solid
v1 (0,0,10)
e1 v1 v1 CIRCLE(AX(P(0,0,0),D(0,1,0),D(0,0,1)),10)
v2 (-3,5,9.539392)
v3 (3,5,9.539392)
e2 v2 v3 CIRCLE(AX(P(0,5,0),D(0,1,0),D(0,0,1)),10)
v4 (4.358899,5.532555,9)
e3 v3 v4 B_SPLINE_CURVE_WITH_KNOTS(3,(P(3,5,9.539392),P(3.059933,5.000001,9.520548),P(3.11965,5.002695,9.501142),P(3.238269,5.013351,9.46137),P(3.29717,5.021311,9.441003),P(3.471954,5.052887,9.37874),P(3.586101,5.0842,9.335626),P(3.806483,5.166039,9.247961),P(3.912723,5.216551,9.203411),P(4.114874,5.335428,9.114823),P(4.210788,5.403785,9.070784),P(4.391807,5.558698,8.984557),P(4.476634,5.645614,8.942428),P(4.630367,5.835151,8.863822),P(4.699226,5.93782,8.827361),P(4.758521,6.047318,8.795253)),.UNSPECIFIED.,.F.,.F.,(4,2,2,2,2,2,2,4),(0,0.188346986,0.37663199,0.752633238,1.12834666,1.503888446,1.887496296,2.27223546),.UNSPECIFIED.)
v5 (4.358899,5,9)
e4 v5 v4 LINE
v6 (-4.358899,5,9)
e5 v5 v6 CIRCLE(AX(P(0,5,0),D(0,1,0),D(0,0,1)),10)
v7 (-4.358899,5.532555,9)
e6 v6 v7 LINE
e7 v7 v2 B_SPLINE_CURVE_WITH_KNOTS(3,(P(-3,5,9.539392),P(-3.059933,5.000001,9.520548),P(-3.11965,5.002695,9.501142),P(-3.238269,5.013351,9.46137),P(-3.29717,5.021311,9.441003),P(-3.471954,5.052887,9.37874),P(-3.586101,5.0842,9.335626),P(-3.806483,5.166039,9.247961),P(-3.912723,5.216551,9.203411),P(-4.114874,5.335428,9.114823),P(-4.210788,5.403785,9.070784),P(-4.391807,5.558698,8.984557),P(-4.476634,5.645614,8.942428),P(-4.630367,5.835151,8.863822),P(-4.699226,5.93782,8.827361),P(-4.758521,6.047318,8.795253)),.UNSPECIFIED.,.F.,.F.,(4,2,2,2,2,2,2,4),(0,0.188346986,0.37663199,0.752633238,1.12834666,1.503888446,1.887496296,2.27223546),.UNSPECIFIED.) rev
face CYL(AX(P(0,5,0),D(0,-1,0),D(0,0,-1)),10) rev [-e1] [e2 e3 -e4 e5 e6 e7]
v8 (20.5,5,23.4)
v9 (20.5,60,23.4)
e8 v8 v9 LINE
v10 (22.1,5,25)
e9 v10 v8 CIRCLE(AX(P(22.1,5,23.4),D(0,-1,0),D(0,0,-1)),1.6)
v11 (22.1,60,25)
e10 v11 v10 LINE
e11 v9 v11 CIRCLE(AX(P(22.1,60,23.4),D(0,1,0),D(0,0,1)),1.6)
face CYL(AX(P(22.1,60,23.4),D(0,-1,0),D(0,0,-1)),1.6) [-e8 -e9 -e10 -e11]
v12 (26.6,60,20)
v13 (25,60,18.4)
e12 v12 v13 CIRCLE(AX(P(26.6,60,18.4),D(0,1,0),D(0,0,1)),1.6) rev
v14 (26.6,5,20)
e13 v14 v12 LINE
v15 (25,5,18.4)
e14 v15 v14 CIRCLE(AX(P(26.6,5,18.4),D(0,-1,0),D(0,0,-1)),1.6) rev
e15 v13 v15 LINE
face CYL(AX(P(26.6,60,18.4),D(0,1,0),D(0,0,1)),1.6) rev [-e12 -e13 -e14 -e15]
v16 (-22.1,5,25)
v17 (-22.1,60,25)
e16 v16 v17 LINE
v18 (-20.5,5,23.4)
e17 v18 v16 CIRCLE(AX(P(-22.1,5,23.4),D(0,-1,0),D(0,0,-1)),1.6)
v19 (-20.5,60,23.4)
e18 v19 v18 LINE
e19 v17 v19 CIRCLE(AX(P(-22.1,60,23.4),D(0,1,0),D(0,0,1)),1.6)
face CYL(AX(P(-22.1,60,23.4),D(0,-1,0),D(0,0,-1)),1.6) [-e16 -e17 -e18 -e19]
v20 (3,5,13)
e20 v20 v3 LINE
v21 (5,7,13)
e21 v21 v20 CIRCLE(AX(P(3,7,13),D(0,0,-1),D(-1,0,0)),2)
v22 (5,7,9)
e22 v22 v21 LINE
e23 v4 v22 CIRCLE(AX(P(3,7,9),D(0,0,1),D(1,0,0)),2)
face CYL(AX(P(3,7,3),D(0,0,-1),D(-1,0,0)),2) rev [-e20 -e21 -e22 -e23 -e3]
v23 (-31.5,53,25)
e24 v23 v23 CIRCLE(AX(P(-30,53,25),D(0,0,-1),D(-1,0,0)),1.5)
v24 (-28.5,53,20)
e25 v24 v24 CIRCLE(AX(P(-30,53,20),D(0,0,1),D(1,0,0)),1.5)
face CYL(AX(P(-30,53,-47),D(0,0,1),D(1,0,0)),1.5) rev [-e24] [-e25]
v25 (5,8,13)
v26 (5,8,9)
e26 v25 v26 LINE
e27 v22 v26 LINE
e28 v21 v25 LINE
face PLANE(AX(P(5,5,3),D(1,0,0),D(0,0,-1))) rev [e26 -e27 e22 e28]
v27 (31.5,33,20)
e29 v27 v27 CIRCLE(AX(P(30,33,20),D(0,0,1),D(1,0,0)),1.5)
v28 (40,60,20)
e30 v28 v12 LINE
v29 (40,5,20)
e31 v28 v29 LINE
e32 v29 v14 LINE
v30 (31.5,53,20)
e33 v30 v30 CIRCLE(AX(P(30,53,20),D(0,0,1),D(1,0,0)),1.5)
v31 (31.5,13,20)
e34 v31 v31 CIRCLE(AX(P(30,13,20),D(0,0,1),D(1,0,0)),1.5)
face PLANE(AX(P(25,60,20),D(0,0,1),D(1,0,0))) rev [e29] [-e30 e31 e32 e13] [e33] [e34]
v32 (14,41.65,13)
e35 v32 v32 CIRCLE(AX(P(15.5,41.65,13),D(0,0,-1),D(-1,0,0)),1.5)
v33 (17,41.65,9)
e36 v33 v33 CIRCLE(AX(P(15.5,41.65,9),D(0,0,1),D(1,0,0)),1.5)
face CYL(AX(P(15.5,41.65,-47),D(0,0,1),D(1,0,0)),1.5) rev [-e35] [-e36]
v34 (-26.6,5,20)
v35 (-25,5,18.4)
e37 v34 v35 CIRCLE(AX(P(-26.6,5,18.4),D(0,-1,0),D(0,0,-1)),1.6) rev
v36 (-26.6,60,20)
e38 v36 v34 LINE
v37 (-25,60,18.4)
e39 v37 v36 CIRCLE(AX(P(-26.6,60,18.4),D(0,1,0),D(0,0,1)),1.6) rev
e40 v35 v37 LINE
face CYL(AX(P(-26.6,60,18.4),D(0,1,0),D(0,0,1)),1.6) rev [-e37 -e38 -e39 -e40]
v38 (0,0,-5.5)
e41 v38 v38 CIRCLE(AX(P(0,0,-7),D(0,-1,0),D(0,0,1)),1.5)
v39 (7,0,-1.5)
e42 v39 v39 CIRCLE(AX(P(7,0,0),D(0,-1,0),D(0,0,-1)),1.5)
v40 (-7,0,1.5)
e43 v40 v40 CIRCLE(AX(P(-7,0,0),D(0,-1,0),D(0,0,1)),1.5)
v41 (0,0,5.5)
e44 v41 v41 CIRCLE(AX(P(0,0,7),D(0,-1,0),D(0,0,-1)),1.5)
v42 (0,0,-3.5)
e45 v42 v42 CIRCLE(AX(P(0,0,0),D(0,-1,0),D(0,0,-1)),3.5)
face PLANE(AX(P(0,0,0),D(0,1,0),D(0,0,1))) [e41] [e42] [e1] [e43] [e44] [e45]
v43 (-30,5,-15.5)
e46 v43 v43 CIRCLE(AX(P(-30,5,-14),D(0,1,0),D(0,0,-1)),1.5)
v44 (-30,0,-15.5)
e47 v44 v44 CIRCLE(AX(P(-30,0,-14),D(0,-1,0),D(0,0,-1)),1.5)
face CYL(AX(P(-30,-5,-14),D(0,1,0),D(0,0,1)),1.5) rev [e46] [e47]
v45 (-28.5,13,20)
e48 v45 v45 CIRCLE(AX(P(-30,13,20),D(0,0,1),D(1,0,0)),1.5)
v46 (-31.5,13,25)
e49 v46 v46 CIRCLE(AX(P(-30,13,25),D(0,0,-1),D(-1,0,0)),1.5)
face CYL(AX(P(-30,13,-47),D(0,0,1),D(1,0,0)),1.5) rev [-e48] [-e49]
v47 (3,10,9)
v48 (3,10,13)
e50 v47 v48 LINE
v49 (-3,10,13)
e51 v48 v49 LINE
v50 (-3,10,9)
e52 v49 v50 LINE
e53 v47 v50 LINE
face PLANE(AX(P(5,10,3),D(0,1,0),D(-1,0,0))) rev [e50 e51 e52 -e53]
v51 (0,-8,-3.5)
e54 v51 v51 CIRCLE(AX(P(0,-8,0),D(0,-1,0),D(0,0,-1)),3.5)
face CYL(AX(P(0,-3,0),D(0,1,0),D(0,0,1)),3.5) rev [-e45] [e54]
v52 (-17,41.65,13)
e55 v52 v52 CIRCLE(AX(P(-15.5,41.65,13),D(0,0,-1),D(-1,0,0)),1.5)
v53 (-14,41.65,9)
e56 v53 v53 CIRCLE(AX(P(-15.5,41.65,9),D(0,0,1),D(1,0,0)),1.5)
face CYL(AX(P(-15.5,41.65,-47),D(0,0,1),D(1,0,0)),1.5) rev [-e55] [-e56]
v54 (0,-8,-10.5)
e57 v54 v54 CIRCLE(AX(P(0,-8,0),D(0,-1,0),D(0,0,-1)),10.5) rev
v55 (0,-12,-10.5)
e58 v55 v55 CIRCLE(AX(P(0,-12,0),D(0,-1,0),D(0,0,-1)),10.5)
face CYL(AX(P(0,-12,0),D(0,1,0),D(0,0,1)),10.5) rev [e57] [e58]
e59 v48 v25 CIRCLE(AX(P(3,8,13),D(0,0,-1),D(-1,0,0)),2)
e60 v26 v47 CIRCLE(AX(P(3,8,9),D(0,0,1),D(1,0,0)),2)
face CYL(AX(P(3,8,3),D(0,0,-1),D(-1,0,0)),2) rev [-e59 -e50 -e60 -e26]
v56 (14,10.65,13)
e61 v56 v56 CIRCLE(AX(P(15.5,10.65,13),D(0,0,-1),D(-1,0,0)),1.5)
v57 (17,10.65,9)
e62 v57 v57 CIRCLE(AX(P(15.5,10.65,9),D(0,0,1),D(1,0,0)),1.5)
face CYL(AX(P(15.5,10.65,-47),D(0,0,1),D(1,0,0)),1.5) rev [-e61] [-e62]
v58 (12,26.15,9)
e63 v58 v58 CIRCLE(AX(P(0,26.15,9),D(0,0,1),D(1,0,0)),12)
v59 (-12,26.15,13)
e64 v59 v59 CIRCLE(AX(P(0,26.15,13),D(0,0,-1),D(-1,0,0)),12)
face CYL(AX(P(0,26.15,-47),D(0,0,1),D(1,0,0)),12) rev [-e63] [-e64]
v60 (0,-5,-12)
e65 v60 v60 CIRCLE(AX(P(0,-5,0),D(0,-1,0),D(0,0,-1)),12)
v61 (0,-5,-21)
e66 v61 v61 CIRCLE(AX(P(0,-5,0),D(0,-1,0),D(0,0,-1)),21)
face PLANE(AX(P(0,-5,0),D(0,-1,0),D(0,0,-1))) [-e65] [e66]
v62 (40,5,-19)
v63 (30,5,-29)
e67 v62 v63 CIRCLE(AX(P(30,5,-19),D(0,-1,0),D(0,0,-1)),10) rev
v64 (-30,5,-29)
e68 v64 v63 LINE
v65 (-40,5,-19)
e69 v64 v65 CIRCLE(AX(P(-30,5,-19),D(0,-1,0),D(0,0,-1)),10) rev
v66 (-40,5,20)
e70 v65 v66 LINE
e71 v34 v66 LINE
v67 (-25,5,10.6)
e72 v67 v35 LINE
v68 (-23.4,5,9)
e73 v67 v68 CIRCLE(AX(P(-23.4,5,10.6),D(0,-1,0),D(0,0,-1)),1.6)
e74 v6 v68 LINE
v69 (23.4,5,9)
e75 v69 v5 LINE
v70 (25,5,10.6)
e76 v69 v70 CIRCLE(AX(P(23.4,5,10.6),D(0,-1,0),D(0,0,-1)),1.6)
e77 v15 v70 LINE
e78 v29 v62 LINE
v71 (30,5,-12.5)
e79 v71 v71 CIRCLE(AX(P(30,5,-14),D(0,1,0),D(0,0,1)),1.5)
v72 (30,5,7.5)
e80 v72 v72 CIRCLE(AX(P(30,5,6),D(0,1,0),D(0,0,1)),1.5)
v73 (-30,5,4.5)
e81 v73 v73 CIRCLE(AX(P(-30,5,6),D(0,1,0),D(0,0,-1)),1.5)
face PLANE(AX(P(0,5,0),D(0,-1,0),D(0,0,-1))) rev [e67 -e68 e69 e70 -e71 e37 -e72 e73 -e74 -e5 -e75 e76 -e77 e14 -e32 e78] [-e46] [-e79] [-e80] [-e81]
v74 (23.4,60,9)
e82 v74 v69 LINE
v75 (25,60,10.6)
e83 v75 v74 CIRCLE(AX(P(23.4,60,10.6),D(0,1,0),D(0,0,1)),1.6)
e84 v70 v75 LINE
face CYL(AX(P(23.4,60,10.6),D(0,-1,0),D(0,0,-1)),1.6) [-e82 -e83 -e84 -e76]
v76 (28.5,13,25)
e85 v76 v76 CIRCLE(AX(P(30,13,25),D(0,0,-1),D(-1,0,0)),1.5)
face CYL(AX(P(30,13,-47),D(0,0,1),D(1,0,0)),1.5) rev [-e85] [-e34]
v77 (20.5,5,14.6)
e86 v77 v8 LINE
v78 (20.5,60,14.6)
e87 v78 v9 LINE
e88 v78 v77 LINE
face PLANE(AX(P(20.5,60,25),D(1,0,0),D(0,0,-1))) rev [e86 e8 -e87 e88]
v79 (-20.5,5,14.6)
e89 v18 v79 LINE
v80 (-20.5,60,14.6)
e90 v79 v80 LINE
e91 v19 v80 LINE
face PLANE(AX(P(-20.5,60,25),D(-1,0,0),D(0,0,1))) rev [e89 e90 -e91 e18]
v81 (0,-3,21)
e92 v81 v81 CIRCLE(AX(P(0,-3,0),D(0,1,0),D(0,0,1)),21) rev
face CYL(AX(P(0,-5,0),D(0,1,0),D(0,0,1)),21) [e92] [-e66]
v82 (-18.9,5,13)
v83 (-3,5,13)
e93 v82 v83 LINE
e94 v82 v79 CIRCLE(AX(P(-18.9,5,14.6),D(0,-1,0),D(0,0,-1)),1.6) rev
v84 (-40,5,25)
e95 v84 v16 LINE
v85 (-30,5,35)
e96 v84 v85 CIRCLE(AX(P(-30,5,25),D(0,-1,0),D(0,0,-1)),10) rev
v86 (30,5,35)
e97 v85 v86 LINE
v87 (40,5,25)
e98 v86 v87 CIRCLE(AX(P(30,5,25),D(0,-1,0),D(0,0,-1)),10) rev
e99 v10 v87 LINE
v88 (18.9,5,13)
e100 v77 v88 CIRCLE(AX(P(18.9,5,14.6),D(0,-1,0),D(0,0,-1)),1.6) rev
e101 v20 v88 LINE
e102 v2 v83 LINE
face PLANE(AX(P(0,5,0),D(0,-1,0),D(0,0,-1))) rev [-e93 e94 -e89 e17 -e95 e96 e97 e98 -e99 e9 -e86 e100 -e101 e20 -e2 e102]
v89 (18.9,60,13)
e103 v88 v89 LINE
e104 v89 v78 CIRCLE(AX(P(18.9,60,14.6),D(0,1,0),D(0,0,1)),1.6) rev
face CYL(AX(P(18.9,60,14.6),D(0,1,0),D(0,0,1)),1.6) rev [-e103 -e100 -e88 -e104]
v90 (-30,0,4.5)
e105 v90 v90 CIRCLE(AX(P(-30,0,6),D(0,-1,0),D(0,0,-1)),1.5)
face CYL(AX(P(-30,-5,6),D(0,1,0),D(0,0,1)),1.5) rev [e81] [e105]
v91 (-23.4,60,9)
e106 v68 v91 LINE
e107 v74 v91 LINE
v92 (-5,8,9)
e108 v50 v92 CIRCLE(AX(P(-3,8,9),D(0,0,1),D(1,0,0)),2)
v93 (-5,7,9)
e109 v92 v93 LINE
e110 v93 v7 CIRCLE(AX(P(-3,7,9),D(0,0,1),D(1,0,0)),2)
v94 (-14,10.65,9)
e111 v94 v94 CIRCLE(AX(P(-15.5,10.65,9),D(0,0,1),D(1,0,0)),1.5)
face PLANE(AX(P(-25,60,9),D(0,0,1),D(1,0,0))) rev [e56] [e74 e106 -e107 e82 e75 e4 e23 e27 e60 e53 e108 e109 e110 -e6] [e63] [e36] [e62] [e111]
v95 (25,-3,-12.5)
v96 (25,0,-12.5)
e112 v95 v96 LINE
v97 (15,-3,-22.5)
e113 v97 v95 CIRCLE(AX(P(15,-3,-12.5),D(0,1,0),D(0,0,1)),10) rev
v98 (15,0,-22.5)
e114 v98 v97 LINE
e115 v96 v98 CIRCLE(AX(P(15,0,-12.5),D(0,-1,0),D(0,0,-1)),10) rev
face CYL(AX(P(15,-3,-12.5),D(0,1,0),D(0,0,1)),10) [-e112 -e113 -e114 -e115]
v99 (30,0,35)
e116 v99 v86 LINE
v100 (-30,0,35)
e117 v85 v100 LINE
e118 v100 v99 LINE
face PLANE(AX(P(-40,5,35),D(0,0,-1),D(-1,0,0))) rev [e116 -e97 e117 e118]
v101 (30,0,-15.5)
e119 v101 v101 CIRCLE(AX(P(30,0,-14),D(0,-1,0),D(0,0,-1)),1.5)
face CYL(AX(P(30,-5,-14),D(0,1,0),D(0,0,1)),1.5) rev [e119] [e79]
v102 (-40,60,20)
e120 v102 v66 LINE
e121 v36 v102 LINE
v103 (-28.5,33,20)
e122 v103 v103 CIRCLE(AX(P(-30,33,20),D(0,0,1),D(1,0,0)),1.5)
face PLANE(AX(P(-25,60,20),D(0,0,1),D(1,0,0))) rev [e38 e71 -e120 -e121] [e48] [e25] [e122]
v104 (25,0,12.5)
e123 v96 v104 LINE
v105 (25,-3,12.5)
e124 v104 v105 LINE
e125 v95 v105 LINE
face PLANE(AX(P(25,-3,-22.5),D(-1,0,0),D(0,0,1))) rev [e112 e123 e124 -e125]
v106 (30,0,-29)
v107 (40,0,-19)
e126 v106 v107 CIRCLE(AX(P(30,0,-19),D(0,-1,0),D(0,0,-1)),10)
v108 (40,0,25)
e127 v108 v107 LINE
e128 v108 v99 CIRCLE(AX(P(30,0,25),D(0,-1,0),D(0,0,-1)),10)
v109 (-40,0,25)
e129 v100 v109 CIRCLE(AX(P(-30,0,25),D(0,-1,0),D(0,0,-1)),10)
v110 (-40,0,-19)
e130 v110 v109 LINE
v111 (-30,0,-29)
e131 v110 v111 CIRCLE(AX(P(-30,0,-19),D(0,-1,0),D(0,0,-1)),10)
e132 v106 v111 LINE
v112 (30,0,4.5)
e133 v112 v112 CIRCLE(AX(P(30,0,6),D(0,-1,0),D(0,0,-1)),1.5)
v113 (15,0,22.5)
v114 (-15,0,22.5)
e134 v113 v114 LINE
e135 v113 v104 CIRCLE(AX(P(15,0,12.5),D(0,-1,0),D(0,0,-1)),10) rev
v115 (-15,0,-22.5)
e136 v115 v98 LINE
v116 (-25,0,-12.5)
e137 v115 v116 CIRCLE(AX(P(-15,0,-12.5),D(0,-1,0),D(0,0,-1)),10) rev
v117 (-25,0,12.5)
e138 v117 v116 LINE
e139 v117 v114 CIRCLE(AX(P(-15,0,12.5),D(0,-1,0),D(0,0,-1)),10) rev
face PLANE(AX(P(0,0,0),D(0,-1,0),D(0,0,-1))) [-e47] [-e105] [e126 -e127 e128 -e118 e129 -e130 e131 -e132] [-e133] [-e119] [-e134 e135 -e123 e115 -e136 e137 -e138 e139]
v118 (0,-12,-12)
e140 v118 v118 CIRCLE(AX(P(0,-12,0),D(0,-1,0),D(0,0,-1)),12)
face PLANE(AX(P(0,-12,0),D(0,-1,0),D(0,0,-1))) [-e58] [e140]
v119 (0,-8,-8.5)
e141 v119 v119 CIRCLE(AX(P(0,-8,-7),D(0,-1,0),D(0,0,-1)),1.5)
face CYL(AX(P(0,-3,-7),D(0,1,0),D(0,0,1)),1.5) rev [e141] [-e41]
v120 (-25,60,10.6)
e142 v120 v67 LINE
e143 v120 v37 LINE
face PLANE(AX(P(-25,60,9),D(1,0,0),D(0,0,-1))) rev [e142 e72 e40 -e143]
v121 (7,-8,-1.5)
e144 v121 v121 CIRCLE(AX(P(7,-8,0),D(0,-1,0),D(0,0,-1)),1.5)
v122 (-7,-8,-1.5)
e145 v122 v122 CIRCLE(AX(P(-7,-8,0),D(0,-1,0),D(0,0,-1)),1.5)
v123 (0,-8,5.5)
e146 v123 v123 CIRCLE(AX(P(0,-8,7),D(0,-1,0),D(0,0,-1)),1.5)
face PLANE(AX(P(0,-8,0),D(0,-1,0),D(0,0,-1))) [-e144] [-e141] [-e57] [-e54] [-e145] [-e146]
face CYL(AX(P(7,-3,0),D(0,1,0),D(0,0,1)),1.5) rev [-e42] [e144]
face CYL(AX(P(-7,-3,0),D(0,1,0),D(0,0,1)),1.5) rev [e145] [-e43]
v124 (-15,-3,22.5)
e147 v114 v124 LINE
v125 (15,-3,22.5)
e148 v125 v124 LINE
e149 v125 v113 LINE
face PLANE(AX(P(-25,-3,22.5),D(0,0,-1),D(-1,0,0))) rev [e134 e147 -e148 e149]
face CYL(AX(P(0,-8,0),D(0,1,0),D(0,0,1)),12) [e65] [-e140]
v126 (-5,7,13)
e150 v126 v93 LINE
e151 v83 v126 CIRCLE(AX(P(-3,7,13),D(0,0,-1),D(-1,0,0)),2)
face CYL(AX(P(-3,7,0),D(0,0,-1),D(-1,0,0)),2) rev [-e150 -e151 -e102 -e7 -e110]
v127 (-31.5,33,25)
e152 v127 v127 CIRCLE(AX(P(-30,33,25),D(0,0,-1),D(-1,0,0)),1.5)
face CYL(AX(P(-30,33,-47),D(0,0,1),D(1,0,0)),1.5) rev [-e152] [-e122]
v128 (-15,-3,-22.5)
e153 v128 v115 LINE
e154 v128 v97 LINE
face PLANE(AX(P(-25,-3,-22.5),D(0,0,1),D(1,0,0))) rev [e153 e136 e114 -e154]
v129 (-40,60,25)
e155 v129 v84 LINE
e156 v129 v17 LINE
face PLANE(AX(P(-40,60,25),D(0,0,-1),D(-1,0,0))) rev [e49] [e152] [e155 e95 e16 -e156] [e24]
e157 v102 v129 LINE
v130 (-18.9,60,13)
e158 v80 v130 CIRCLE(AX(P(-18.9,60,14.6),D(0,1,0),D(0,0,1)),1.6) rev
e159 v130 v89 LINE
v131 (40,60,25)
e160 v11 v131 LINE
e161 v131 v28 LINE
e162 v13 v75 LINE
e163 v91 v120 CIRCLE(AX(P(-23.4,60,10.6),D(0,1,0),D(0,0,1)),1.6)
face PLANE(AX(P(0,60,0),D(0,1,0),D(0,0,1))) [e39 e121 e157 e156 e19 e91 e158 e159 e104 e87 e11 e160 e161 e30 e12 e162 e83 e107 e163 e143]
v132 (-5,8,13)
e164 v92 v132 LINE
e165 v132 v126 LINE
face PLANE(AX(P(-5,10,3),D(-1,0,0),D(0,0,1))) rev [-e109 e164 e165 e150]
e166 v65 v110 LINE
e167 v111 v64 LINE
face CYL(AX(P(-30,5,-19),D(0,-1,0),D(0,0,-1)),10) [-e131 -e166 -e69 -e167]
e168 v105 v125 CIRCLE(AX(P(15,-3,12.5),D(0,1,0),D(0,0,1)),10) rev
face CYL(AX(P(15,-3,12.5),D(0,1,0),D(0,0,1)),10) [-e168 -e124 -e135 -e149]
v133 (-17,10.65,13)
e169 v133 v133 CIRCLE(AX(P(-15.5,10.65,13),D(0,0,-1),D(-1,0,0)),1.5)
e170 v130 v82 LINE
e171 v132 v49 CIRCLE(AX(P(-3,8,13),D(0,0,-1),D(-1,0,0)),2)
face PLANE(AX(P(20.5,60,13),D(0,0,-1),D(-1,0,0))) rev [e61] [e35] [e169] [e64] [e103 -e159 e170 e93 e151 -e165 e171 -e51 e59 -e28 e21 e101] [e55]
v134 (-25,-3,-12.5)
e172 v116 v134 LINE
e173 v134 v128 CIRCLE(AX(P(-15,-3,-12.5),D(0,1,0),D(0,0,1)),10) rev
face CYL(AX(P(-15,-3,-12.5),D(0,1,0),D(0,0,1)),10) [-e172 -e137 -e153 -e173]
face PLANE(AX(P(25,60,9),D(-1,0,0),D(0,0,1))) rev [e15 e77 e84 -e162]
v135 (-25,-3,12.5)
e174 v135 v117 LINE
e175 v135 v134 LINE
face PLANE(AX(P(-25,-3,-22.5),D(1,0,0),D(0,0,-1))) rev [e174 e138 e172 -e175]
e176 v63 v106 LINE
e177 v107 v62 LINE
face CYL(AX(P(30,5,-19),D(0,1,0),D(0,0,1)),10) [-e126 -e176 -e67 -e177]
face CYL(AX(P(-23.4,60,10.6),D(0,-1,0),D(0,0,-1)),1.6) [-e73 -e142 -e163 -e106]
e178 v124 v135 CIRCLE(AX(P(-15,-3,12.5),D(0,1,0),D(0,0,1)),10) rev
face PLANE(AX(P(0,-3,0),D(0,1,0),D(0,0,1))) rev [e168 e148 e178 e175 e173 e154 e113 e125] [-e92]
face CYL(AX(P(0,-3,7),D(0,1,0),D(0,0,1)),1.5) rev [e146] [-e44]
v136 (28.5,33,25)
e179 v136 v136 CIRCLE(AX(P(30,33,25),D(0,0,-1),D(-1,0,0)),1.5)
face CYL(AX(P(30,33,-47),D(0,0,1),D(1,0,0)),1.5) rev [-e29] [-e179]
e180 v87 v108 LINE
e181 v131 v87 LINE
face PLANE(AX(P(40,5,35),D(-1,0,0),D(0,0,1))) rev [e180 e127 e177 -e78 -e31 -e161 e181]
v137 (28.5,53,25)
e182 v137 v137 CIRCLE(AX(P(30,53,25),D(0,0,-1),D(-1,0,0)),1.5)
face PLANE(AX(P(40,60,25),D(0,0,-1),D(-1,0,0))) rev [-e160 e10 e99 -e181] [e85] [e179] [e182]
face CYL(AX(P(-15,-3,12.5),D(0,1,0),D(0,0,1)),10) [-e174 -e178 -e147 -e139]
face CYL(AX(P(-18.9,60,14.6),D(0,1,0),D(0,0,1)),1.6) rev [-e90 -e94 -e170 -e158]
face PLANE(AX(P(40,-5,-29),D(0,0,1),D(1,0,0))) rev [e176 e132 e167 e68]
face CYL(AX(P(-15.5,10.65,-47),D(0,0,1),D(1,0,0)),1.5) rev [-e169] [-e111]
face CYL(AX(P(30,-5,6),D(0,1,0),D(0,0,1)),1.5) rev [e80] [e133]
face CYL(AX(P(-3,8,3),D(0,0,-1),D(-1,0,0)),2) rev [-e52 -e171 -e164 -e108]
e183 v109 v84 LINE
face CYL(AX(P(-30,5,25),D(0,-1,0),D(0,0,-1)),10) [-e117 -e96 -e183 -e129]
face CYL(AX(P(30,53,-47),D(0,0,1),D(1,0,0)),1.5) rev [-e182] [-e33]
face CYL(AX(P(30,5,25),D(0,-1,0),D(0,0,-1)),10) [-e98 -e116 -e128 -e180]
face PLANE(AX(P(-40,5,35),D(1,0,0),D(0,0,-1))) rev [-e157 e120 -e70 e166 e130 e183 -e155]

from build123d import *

# Parameters (mm, degrees)
SKETCH_1_W               = 80
SKETCH_1_H               = 70
SKETCH_1_R               = 10
EXTRUDE_1_DEPTH          = 5
EXTRUDE_2_DEPTH          = 55
CUT_EXTRUDE_1_DEPTH      = 60
CUT_EXTRUDE_1_DEPTH_BACK = 60
SKETCH_3_R               = 12
SKETCH_3_R_2             = 1.5
FILLET_3_R               = 1.6
SKETCH_4_R               = 1.5
CUT_EXTRUDE_2_DEPTH      = 10
SKETCH_5_W               = 80
SKETCH_5_H               = 6
CUT_EXTRUDE_3_DEPTH      = 10
FILLET_4_R               = 10
CUT_EXTRUDE_4_DEPTH      = 10
FILLET_5_R               = 2
SKETCH_8_W               = 50
SKETCH_8_H               = 45
SKETCH_8_R               = 3.5
SKETCH_8_R_2             = 1.5
EXTRUDE_3_DEPTH          = 3
FILLET_6_R               = 10
SKETCH_10_R              = 12
SKETCH_10_R_2            = 1.5
SKETCH_10_R_3            = 3.5
EXTRUDE_4_DEPTH          = 5
SKETCH_12_R              = 12
SKETCH_12_R_2            = 10.5
EXTRUDE_5_DEPTH          = 4
SKETCH_13_R              = 21
SKETCH_13_R_2            = 12
EXTRUDE_6_DEPTH          = 2


with BuildPart() as part:
    # 草图1 → 凸台-拉伸1 (new body)
    with BuildSketch(Plane(origin=(0, 0, 0), x_dir=(1, 0, 0), z_dir=(0, 1, 0))):
        Rectangle(SKETCH_1_W, SKETCH_1_H)
        with Locations(Location((0, 0, 0), (0, 0, 270))):
            Circle(SKETCH_1_R, mode=Mode.SUBTRACT)
    extrude(amount=EXTRUDE_1_DEPTH)

    # 草图2 → 凸台-拉伸2 (add)
    with BuildSketch(Plane(origin=(0, 5, 0), x_dir=(1, 0, 0), z_dir=(0, 1, 0))):
        Polygon((-25, -9), (25, -9), (25, -20), (40, -20), (40, -25), (20.5, -25), (20.5, -13), (-20.5, -13), (-20.5, -25), (-40, -25), (-40, -20), (-25, -20), align=None)
    extrude(amount=EXTRUDE_2_DEPTH)

    # 草图3 → 切除-拉伸1 (cut, two sides: drawn at the far end of the back side and taken through both)
    with BuildSketch(Plane.XY.offset(13).offset(-CUT_EXTRUDE_1_DEPTH_BACK)):
        with Locations((0, 26.15)):
            Circle(SKETCH_3_R)
        with Locations((15.5, 41.65)):
            Circle(SKETCH_3_R_2)
        with Locations((15.5, 10.65)):
            Circle(SKETCH_3_R_2)
        with Locations((-15.5, 10.65)):
            Circle(SKETCH_3_R_2)
        with Locations((-15.5, 41.65)):
            Circle(SKETCH_3_R_2)
        with Locations((-30, 13)):
            Circle(SKETCH_3_R_2)
        with Locations((-30, 33)):
            Circle(SKETCH_3_R_2)
        with Locations((-30, 53)):
            Circle(SKETCH_3_R_2)
        with Locations((30, 53)):
            Circle(SKETCH_3_R_2)
        with Locations((30, 33)):
            Circle(SKETCH_3_R_2)
        with Locations((30, 13)):
            Circle(SKETCH_3_R_2)
    extrude(amount=CUT_EXTRUDE_1_DEPTH + CUT_EXTRUDE_1_DEPTH_BACK, mode=Mode.SUBTRACT)

    # 圆角3
    fillet_3_edges = [part.edges().sort_by_distance(p)[0] for p in [
        (25, 32.5, 20),
        (25, 32.5, 9),
        (-25, 32.5, 9),
        (-25, 32.5, 20),
        (-20.5, 32.5, 25),
        (-20.5, 32.5, 13),
        (20.5, 32.5, 13),
        (20.5, 32.5, 25),
    ]]
    fillet(fillet_3_edges, radius=FILLET_3_R)

    # 草图4 → 切除-拉伸2 (cut)
    with BuildSketch(Plane(origin=(0, 5, 0), x_dir=(1, 0, 0), z_dir=(0, 1, 0))):
        with Locations(Location((30, 14, 0), (0, 0, 270))):
            Circle(SKETCH_4_R)
        with Locations(Location((30, -6, 0), (0, 0, 270))):
            Circle(SKETCH_4_R)
        with Locations(Location((-30, -6, 0), (0, 0, 90))):
            Circle(SKETCH_4_R)
        with Locations(Location((-30, 14, 0), (0, 0, 90))):
            Circle(SKETCH_4_R)
    extrude(amount=-CUT_EXTRUDE_2_DEPTH, mode=Mode.SUBTRACT)

    # 草图5 → 切除-拉伸3 (cut)
    with BuildSketch(Plane(origin=(0, 5, 0), x_dir=(1, 0, 0), z_dir=(0, 1, 0))):
        with Locations((0, 32)):
            Rectangle(SKETCH_5_W, SKETCH_5_H)
    extrude(amount=-CUT_EXTRUDE_3_DEPTH, mode=Mode.SUBTRACT)

    # 圆角4
    fillet_4_edges = [part.edges().sort_by_distance(p)[0] for p in [
        (-40, 2.5, -29),
        (40, 2.5, -29),
        (40, 2.5, 35),
        (-40, 2.5, 35),
    ]]
    fillet(fillet_4_edges, radius=FILLET_4_R)

    # 草图6 → 切除-拉伸4 (cut)
    with BuildSketch(Plane.XY.offset(13)):
        Polygon((0, 5), (5, 5), (5, 10), (-5, 10), (-5, 5), align=None)
    extrude(amount=-CUT_EXTRUDE_4_DEPTH, mode=Mode.SUBTRACT)

    # 圆角5
    # the kernel refuses this fillet: 2 mm, written as the material it adds along each edge
    with BuildSketch(Plane(origin=(-5, 5, 13), x_dir=(1, 0, 0), z_dir=(0, 0, -1))) as fillet_5_piece_1_section:
        with BuildLine():
            CenterArc((FILLET_5_R, -FILLET_5_R), FILLET_5_R, 90, 90)
            Line((0, -FILLET_5_R), (0, 0))
            Line((0, 0), (FILLET_5_R, 0))
        make_face()
    fillet_5_piece_1 = extrude(amount=4, mode=Mode.PRIVATE)
    fillet_5_piece_1 = fillet_5_piece_1 - Plane(origin=(0, 5.457543307, 0), x_dir=(0, 0, 1), z_dir=(0, -1, 0)) * Cylinder(10, 17, mode=Mode.PRIVATE)
    add(fillet_5_piece_1)
    with BuildSketch(Plane(origin=(-5, 10, 13), x_dir=(0, -1, 0), z_dir=(0, 0, -1)), Plane(origin=(5, 10, 13), x_dir=(-1, 0, 0), z_dir=(0, 0, -1))) as fillet_5_piece_2:
        with BuildLine():
            CenterArc((FILLET_5_R, -FILLET_5_R), FILLET_5_R, 90, 90)
            Line((0, -FILLET_5_R), (0, 0))
            Line((0, 0), (FILLET_5_R, 0))
        make_face()
    extrude(amount=4)
    with BuildSketch(Plane(origin=(5, 5, 13), x_dir=(-1, 0, 0), z_dir=(0, 0, -1))) as fillet_5_piece_3_section:
        with BuildLine():
            CenterArc((FILLET_5_R, FILLET_5_R), FILLET_5_R, 180, 90)
            Line((0, FILLET_5_R), (0, 0))
            Line((0, 0), (FILLET_5_R, 0))
        make_face()
    fillet_5_piece_3 = extrude(amount=4, mode=Mode.PRIVATE)
    fillet_5_piece_3 = fillet_5_piece_3 - Plane(origin=(0, 5.457543307, 0), x_dir=(0, 0, 1), z_dir=(0, -1, 0)) * Cylinder(10, 17, mode=Mode.PRIVATE)
    add(fillet_5_piece_3)

    # 草图8 → 凸台-拉伸3 (add)
    with BuildSketch(Plane.XZ):
        Rectangle(SKETCH_8_W, SKETCH_8_H)
        with Locations(Location((0, 0, 0), (0, 0, 270))):
            Circle(SKETCH_8_R, mode=Mode.SUBTRACT)
        with Locations(Location((0, 7, 0), (0, 0, 270))):
            Circle(SKETCH_8_R_2, mode=Mode.SUBTRACT)
        with Locations(Location((7, 0, 0), (0, 0, 270))):
            Circle(SKETCH_8_R_2, mode=Mode.SUBTRACT)
        with Locations(Location((-7, 0, 0), (0, 0, 90))):
            Circle(SKETCH_8_R_2, mode=Mode.SUBTRACT)
        with Locations(Location((0, -7, 0), (0, 0, 90))):
            Circle(SKETCH_8_R_2, mode=Mode.SUBTRACT)
    extrude(amount=EXTRUDE_3_DEPTH)

    # 圆角6
    fillet_6_edges = [part.edges().sort_by_distance(p)[0] for p in [
        (25, -1.5, -22.5),
        (25, -1.5, 22.5),
        (-25, -1.5, 22.5),
        (-25, -1.5, -22.5),
    ]]
    fillet(fillet_6_edges, radius=FILLET_6_R)

    # 草图10 → 凸台-拉伸4 (add)
    with BuildSketch(Plane.XZ.offset(3)):
        with Locations(Location((0, 0, 0), (0, 0, 270))):
            Circle(SKETCH_10_R)
        with Locations(Location((0, -7, 0), (0, 0, 90))):
            Circle(SKETCH_10_R_2, mode=Mode.SUBTRACT)
        with Locations(Location((-7, 0, 0), (0, 0, 90))):
            Circle(SKETCH_10_R_2, mode=Mode.SUBTRACT)
        with Locations(Location((7, 0, 0), (0, 0, 270))):
            Circle(SKETCH_10_R_2, mode=Mode.SUBTRACT)
        with Locations(Location((0, 0, 0), (0, 0, 270))):
            Circle(SKETCH_10_R_3, mode=Mode.SUBTRACT)
        with Locations(Location((0, 7, 0), (0, 0, 270))):
            Circle(SKETCH_10_R_2, mode=Mode.SUBTRACT)
    extrude(amount=EXTRUDE_4_DEPTH)

    # 草图12 → 凸台-拉伸5 (add)
    with BuildSketch(Plane.XZ.offset(8)):
        with Locations(Location((0, 0, 0), (0, 0, 270))):
            Circle(SKETCH_12_R)
        with Locations(Location((0, 0, 0), (0, 0, 270))):
            Circle(SKETCH_12_R_2, mode=Mode.SUBTRACT)
    extrude(amount=EXTRUDE_5_DEPTH)

    # 草图13 → 凸台-拉伸6 (add)
    with BuildSketch(Plane.XZ.offset(3)):
        with Locations(Location((0, 0, 0), (0, 0, 90))):
            Circle(SKETCH_13_R)
        with Locations(Location((0, 0, 0), (0, 0, 270))):
            Circle(SKETCH_13_R_2, mode=Mode.SUBTRACT)
    extrude(amount=EXTRUDE_6_DEPTH)


solid = part.part
